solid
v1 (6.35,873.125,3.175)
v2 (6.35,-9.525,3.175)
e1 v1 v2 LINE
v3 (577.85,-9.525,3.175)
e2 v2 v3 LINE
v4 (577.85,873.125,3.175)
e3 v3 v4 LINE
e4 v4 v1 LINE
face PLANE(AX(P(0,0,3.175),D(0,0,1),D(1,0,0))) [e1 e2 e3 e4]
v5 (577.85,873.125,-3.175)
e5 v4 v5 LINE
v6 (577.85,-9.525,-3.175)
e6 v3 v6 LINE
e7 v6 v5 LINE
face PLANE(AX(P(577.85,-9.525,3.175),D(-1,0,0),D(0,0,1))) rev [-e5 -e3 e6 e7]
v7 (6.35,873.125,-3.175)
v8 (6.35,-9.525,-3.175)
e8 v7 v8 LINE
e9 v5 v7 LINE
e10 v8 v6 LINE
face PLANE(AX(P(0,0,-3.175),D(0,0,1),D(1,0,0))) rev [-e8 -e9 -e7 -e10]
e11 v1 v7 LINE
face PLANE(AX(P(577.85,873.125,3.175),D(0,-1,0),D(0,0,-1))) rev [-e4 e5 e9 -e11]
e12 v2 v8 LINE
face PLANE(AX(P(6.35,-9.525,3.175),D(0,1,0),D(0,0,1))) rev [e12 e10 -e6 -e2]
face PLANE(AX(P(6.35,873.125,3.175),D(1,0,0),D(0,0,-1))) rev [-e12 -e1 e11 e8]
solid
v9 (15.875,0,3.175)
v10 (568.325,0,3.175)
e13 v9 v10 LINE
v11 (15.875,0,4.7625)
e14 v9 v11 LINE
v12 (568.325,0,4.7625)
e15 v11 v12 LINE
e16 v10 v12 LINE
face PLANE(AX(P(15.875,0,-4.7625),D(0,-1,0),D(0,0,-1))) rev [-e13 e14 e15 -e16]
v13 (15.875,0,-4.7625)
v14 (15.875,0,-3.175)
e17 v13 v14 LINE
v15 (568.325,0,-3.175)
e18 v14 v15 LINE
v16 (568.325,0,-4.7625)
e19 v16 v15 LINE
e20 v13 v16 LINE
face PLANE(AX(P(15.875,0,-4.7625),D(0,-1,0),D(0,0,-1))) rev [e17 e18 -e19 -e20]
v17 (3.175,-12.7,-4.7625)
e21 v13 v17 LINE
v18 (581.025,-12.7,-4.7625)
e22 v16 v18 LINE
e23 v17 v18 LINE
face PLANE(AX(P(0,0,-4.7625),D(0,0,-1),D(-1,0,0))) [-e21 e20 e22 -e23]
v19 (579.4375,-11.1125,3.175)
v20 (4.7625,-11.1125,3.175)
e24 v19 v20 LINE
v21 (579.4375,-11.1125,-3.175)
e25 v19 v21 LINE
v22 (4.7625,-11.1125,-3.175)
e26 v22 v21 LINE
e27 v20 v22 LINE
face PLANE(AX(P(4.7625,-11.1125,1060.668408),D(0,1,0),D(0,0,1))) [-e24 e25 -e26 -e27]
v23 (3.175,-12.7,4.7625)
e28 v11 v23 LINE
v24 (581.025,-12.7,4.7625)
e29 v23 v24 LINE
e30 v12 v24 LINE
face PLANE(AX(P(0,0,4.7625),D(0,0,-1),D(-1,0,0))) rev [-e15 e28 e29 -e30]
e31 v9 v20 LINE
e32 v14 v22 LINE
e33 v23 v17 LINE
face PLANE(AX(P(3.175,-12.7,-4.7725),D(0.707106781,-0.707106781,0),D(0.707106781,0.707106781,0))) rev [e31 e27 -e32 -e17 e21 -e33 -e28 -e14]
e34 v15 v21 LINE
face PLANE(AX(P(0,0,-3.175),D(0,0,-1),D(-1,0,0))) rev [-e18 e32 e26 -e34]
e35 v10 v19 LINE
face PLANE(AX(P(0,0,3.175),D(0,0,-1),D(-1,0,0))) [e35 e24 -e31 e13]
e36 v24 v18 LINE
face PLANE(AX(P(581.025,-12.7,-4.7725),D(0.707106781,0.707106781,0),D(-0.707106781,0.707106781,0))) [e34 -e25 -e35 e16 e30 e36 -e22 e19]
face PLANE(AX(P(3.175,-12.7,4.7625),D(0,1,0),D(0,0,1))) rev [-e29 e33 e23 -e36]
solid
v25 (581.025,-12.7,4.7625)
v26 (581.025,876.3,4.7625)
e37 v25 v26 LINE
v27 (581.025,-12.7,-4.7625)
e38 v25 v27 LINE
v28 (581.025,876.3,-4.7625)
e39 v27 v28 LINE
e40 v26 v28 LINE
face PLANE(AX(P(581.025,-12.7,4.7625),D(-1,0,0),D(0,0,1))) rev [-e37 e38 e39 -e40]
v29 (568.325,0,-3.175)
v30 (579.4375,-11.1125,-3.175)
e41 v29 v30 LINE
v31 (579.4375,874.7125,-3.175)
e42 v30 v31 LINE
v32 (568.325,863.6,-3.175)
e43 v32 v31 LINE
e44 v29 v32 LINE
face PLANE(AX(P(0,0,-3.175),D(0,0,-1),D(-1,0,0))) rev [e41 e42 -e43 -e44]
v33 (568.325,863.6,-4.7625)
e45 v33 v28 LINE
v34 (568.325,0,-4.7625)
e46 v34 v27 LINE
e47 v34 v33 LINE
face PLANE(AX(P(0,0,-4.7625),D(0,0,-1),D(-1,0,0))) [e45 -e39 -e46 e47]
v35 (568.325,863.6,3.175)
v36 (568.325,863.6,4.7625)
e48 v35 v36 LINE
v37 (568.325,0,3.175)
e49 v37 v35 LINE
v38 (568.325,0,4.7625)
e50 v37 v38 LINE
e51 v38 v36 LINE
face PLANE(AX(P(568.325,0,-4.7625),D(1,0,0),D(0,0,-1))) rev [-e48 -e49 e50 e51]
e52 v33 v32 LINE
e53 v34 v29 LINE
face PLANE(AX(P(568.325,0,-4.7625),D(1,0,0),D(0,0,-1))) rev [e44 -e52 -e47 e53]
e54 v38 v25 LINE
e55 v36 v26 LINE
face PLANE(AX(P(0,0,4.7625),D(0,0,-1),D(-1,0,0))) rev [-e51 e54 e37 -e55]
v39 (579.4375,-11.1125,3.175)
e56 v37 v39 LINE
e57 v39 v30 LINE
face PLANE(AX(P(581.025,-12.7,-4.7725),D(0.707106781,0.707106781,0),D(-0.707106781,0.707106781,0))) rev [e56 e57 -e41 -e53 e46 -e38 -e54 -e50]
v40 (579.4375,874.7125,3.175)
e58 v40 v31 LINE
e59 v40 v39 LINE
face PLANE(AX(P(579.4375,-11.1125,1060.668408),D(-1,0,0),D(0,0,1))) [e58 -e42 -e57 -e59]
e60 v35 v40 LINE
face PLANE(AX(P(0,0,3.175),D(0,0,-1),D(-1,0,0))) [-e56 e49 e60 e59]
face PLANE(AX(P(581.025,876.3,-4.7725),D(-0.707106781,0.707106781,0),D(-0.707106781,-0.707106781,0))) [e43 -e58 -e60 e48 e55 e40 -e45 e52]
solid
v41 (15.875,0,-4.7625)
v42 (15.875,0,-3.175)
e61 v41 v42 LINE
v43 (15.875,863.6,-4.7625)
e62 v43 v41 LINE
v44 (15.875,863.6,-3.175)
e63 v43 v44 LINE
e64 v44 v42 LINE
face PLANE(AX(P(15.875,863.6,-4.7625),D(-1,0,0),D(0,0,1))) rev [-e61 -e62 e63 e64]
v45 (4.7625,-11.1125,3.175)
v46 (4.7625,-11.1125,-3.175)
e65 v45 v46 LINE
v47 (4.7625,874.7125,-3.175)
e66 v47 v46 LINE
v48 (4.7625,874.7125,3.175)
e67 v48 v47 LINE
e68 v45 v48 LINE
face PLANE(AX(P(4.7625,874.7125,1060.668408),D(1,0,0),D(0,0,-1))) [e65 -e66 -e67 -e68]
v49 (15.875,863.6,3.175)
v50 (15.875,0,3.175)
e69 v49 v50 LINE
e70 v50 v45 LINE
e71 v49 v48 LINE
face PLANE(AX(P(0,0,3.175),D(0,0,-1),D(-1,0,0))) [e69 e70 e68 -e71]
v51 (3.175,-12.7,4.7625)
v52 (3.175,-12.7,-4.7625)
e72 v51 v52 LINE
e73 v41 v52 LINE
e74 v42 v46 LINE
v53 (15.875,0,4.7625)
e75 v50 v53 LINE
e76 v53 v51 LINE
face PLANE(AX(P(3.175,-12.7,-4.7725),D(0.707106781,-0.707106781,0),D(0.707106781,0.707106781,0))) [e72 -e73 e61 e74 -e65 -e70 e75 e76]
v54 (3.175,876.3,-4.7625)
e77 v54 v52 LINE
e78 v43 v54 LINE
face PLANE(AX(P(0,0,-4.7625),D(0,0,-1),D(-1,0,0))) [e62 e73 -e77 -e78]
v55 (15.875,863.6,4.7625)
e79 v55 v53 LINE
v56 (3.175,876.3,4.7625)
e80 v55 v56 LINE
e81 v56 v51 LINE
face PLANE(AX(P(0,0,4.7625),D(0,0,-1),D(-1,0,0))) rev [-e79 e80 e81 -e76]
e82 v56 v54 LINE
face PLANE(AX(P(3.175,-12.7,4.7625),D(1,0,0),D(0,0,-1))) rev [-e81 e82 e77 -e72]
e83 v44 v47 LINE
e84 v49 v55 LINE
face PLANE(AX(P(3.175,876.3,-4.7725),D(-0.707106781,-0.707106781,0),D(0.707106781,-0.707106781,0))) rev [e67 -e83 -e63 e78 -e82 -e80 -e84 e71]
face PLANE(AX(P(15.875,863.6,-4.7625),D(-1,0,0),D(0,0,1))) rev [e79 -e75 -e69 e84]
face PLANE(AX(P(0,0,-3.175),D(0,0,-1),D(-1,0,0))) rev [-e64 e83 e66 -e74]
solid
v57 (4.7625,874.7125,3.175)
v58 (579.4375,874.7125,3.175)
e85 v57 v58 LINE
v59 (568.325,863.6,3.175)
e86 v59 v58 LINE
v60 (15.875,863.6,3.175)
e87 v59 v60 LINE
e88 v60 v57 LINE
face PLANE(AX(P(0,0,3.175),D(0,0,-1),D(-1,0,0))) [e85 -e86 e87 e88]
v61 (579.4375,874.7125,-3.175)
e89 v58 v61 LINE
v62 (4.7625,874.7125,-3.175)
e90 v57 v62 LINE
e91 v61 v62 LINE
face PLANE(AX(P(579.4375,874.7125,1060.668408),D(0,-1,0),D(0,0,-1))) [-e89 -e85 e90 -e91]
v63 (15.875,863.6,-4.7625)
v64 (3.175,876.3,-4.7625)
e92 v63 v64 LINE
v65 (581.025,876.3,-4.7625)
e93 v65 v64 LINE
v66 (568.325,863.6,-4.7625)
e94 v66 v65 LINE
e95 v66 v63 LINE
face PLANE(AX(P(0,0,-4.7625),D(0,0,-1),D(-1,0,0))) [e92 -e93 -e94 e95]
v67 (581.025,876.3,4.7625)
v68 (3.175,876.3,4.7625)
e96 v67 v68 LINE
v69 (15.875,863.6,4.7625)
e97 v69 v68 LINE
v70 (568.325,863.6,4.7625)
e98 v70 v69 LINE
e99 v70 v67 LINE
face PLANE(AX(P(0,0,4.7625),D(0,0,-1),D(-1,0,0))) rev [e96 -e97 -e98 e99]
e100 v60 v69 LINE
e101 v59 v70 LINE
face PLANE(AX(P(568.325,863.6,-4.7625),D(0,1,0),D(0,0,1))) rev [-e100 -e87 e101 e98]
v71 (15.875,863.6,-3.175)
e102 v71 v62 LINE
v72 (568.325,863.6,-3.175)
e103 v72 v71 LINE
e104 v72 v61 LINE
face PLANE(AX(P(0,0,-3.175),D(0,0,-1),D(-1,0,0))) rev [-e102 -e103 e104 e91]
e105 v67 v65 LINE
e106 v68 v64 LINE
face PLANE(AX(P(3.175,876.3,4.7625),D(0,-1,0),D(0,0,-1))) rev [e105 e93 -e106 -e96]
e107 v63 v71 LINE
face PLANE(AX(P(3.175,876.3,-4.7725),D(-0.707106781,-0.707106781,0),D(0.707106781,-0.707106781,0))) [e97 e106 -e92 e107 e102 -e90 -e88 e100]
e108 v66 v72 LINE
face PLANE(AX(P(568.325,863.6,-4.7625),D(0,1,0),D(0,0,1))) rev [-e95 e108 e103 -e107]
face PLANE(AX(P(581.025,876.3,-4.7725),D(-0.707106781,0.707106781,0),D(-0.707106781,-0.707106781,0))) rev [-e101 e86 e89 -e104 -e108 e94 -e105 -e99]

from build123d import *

# Parameters (mm, degrees)
SKETCH2_W               = 577.85
SKETCH2_H               = 889
BOSS_EXTRUDE1_DEPTH     = 4.7625
SKETCH3_W               = 552.45
SKETCH3_H               = 863.6
CUT_EXTRUDE1_DEPTH      = 1052.466816523
CUT_EXTRUDE2_DEPTH      = 3.175
CUT_EXTRUDE2_DEPTH_BACK = 3.175
SKETCH4_W               = 574.675
SKETCH4_H               = 885.825
SPLIT1_START            = -4.7625
SPLIT1_DEPTH            = 9.525
SPLIT1_2_DEPTH          = 1.5875
SPLIT1_START_2          = 3.175
SPLIT1_3_DEPTH          = 1.5875
SPLIT1_START_3          = -3.175
SPLIT1_4_DEPTH          = 6.35
SPLIT1_5_DEPTH          = 1.5875
SPLIT1_6_DEPTH          = 1.5875
SPLIT1_7_DEPTH          = 6.35
SPLIT1_8_DEPTH          = 1.5875
SPLIT1_9_DEPTH          = 1.5875
SPLIT1_10_DEPTH         = 6.35
SKETCH6_W               = 571.5
SKETCH6_H               = 882.65
BOSS_EXTRUDE2_DEPTH     = 3.175


# Read off the part's stored shape, not the designer's step: Split1
with BuildPart() as part:
    # Sketch2 → Boss-Extrude1 (new, symmetric)
    with BuildSketch(Plane.XY):
        with Locations((292.1, 431.8)):
            Rectangle(SKETCH2_W, SKETCH2_H)
    extrude(amount=BOSS_EXTRUDE1_DEPTH, both=True)

    # Sketch3 → Cut-Extrude1 (cut, through all)
    with BuildSketch(Plane.XY.offset(4.7625)):
        with Locations((292.1, 431.8)):
            Rectangle(SKETCH3_W, SKETCH3_H)
    extrude(amount=-CUT_EXTRUDE1_DEPTH, mode=Mode.SUBTRACT)

    # Sketch4 → Cut-Extrude2 (cut, two sides: drawn at the far end of the back side and taken through both)
    with BuildSketch(Plane.XY.offset(-CUT_EXTRUDE2_DEPTH_BACK)):
        with Locations((292.1, 431.8)):
            Rectangle(SKETCH4_W, SKETCH4_H)
    extrude(amount=CUT_EXTRUDE2_DEPTH + CUT_EXTRUDE2_DEPTH_BACK, mode=Mode.SUBTRACT)

    # Split1 outline → Split1 (cut)
    with BuildSketch(Plane.XY.offset(SPLIT1_START)):
        Polygon((581.025, 876.3), (3.175, 876.3), (15.875, 863.6), (568.325, 863.6), (568.325, 0), (15.875, 0), (3.175, -12.7), (581.025, -12.7), align=None)
    extrude(amount=SPLIT1_DEPTH, mode=Mode.SUBTRACT)


with BuildPart() as body_2:
    # Split1 2 outline → Split1 2 (new body)
    with BuildSketch(Plane.XY.offset(SPLIT1_START)):
        Polygon((581.025, 876.3), (3.175, 876.3), (15.875, 863.6), (568.325, 863.6), align=None)
    extrude(amount=SPLIT1_2_DEPTH)

    # Split1 3 outline → Split1 3 (add)
    with BuildSketch(Plane.XY.offset(SPLIT1_START_2)):
        Polygon((581.025, 876.3), (3.175, 876.3), (15.875, 863.6), (568.325, 863.6), align=None)
    extrude(amount=SPLIT1_3_DEPTH)

    # Split1 4 outline → Split1 4 (add)
    with BuildSketch(Plane.XY.offset(SPLIT1_START_3)):
        Polygon((579.4375, 874.7125), (581.025, 876.3), (3.175, 876.3), (4.7625, 874.7125), align=None)
    extrude(amount=SPLIT1_4_DEPTH)


with BuildPart() as body_3:
    # Split1 5 outline → Split1 5 (new body)
    with BuildSketch(Plane.XY.offset(SPLIT1_START)):
        Polygon((581.025, -12.7), (581.025, 876.3), (568.325, 863.6), (568.325, 0), align=None)
    extrude(amount=SPLIT1_5_DEPTH)

    # Split1 6 outline → Split1 6 (add)
    with BuildSketch(Plane.XY.offset(SPLIT1_START_2)):
        Polygon((581.025, -12.7), (581.025, 876.3), (568.325, 863.6), (568.325, 0), align=None)
    extrude(amount=SPLIT1_6_DEPTH)

    # Split1 7 outline → Split1 7 (add)
    with BuildSketch(Plane.XY.offset(SPLIT1_START_3)):
        Polygon((579.4375, -11.1125), (581.025, -12.7), (581.025, 876.3), (579.4375, 874.7125), align=None)
    extrude(amount=SPLIT1_7_DEPTH)


with BuildPart() as body_4:
    # Split1 8 outline → Split1 8 (new body)
    with BuildSketch(Plane.XY.offset(SPLIT1_START)):
        Polygon((3.175, -12.7), (581.025, -12.7), (568.325, 0), (15.875, 0), align=None)
    extrude(amount=SPLIT1_8_DEPTH)

    # Split1 9 outline → Split1 9 (add)
    with BuildSketch(Plane.XY.offset(SPLIT1_START_2)):
        Polygon((3.175, -12.7), (581.025, -12.7), (568.325, 0), (15.875, 0), align=None)
    extrude(amount=SPLIT1_9_DEPTH)

    # Split1 10 outline → Split1 10 (add)
    with BuildSketch(Plane.XY.offset(SPLIT1_START_3)):
        Polygon((4.7625, -11.1125), (3.175, -12.7), (581.025, -12.7), (579.4375, -11.1125), align=None)
    extrude(amount=SPLIT1_10_DEPTH)


with BuildPart() as body_5:
    # Sketch6 → Boss-Extrude2 (new, symmetric)
    with BuildSketch(Plane.XY):
        with Locations((292.1, 431.8)):
            Rectangle(SKETCH6_W, SKETCH6_H)
    extrude(amount=BOSS_EXTRUDE2_DEPTH, both=True)


solid = Compound([part.part, body_2.part, body_3.part, body_4.part, body_5.part])
